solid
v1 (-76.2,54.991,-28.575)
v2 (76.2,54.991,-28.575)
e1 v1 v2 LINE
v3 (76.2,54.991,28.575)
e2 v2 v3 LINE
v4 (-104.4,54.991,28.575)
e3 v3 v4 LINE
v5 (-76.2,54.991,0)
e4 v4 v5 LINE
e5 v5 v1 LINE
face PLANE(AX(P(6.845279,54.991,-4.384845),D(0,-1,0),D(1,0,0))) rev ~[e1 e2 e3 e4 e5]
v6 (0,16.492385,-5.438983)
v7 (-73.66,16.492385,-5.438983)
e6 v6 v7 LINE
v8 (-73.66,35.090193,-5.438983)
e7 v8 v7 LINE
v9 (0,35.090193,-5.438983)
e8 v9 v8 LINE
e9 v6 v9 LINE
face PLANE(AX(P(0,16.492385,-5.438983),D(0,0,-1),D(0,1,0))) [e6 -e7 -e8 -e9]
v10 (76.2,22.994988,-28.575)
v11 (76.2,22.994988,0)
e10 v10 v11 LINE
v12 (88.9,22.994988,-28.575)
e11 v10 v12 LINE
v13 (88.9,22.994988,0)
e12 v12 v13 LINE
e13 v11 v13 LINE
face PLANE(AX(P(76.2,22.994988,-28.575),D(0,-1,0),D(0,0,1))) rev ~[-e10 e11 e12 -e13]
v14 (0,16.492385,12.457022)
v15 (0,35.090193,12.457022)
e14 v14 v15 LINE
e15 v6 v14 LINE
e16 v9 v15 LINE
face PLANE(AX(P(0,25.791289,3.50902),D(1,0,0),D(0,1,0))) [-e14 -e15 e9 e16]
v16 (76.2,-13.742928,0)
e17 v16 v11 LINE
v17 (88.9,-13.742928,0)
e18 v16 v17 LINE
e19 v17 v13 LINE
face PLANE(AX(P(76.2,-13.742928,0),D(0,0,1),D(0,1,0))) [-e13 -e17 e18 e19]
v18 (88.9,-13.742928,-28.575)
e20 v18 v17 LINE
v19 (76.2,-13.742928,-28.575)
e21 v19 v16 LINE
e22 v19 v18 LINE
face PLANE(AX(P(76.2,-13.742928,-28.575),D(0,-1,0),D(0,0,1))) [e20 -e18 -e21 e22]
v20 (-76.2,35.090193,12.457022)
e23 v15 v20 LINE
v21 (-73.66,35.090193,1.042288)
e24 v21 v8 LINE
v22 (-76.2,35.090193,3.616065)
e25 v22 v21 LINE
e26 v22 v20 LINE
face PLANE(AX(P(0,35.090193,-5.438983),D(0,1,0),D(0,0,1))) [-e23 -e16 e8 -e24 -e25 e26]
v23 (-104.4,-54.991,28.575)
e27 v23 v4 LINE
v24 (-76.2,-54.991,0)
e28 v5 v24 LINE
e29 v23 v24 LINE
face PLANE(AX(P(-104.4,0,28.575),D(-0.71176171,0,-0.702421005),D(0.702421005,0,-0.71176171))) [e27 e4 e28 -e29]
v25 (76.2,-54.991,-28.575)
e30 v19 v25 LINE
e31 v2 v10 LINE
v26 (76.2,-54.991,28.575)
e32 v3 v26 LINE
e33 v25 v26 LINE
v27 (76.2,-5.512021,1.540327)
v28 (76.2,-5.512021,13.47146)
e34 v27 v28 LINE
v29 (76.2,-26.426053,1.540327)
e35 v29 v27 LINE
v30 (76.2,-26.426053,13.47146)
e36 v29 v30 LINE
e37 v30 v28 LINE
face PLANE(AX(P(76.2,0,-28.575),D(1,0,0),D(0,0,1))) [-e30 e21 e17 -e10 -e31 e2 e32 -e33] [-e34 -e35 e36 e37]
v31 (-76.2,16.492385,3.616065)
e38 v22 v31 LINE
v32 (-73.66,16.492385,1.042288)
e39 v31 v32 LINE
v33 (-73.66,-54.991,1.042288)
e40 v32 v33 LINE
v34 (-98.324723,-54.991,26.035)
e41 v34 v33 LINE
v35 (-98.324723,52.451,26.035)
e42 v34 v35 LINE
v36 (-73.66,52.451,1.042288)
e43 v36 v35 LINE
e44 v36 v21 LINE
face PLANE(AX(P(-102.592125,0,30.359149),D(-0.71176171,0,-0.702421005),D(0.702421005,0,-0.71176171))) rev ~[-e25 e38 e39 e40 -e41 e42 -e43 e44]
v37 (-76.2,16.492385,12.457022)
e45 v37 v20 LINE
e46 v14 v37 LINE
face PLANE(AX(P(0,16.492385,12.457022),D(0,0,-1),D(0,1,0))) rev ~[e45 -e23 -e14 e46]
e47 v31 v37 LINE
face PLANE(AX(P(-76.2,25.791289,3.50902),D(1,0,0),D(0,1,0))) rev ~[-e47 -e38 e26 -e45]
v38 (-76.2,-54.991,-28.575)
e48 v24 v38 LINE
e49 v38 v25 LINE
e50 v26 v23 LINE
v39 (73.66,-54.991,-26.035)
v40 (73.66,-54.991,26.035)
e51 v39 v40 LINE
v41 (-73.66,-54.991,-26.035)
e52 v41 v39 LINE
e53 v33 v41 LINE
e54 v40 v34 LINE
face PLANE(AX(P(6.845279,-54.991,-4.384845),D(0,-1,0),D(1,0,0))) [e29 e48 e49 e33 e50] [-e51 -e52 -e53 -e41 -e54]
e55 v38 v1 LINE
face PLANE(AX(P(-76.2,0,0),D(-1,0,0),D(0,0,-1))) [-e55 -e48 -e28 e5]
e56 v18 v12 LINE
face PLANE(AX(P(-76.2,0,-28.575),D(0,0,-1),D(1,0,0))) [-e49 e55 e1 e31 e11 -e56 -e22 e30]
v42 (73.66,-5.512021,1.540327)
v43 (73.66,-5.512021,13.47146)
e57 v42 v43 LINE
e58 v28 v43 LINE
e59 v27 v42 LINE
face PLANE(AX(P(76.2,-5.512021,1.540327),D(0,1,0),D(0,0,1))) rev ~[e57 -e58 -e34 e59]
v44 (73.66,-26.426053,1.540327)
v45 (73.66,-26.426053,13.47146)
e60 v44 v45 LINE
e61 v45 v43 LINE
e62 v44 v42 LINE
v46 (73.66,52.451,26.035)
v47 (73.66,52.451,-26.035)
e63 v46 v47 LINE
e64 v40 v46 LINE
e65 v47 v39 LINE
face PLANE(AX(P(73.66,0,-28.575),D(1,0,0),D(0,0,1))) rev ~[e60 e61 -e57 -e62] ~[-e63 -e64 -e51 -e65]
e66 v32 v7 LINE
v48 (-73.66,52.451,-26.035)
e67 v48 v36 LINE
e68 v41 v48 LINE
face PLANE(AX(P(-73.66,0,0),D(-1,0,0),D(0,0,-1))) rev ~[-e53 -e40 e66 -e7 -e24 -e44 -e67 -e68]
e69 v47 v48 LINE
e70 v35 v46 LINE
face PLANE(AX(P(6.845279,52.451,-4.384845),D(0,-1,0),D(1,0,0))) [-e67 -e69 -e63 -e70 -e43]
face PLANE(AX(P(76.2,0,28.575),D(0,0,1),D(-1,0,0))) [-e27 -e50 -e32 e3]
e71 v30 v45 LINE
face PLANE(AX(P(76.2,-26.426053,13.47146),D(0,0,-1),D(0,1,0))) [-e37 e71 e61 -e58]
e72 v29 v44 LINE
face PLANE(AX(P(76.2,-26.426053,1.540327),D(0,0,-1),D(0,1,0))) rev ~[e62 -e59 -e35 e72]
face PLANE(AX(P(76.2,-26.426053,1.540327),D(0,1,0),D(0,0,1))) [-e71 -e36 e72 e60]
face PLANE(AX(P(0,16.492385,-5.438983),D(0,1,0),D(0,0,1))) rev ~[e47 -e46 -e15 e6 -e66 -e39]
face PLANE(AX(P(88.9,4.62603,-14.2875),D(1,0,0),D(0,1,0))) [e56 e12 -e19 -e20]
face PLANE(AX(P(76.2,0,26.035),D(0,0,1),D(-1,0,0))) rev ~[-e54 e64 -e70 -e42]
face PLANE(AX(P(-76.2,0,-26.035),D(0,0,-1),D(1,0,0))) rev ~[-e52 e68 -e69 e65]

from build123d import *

# Parameters (mm, degrees)
F0_W     = 24
F0_H     = 28.575
F1_DEPTH = 54.991
F2_T     = -2.54
F3_W     = 18.5978077352
F3_H     = 17.8960040212
F4_DEPTH = 76.2
F5_W     = 36.7379160598
F5_H     = 28.575
F6_DEPTH = 12.7
F7_W     = 20.9140316583
F7_H     = 11.9311325252
F8_DEPTH = 25.4


# Not quite as in the source:
# - a feature of the source that left no trace in its solid (it failed there, or was rolled back) is left out


with BuildPart() as f1:
    # F0 (on Front) → F1 (new body, symmetric)
    with BuildSketch(Plane.XZ):
        Polygon((-76.2, -28.575), (76.2, -28.575), (76.2, 28.575), (0, 28.575), (28.2, 0), (-52.2, 0), (-76.2, 0), align=None)
        Polygon((-104.4, 28.575), (-76.2, 0), (-76.2, 28.575), align=None)
        with Locations((-64.2, 14.2875)):
            Rectangle(F0_W, F0_H)
        Polygon((28.2, 0), (0, 28.575), (-52.2, 28.575), (-52.2, 0), align=None)
    extrude(amount=F1_DEPTH, both=True)

    # F2
    f2_openings = [f1.faces().sort_by_distance(p)[0] for p in [
        (-3.78476, -54.991, 0.842286),
    ]]
    offset(amount=F2_T, openings=f2_openings, kind=Kind.INTERSECTION)

    # F3 (on Right) → F4 (join, through all)
    with BuildSketch(Plane.YZ):
        with Locations((25.7912892848, 3.5090195015)):
            Rectangle(F3_W, F3_H)
    extrude(amount=-F4_DEPTH)

    # F5 (on face) → F6 (join)
    with BuildSketch(Plane.YZ.offset(76.2)):
        with Locations((4.6260296367, -14.2875)):
            Rectangle(F5_W, F5_H)
    extrude(amount=F6_DEPTH)

    # F7 (on face) → F8 (cut)
    with BuildSketch(Plane.YZ.offset(76.2)):
        with Locations((-15.9690368455, 7.5058937073)):
            Rectangle(F7_W, F7_H)
    extrude(amount=-F8_DEPTH, mode=Mode.SUBTRACT)


solid = f1.part
